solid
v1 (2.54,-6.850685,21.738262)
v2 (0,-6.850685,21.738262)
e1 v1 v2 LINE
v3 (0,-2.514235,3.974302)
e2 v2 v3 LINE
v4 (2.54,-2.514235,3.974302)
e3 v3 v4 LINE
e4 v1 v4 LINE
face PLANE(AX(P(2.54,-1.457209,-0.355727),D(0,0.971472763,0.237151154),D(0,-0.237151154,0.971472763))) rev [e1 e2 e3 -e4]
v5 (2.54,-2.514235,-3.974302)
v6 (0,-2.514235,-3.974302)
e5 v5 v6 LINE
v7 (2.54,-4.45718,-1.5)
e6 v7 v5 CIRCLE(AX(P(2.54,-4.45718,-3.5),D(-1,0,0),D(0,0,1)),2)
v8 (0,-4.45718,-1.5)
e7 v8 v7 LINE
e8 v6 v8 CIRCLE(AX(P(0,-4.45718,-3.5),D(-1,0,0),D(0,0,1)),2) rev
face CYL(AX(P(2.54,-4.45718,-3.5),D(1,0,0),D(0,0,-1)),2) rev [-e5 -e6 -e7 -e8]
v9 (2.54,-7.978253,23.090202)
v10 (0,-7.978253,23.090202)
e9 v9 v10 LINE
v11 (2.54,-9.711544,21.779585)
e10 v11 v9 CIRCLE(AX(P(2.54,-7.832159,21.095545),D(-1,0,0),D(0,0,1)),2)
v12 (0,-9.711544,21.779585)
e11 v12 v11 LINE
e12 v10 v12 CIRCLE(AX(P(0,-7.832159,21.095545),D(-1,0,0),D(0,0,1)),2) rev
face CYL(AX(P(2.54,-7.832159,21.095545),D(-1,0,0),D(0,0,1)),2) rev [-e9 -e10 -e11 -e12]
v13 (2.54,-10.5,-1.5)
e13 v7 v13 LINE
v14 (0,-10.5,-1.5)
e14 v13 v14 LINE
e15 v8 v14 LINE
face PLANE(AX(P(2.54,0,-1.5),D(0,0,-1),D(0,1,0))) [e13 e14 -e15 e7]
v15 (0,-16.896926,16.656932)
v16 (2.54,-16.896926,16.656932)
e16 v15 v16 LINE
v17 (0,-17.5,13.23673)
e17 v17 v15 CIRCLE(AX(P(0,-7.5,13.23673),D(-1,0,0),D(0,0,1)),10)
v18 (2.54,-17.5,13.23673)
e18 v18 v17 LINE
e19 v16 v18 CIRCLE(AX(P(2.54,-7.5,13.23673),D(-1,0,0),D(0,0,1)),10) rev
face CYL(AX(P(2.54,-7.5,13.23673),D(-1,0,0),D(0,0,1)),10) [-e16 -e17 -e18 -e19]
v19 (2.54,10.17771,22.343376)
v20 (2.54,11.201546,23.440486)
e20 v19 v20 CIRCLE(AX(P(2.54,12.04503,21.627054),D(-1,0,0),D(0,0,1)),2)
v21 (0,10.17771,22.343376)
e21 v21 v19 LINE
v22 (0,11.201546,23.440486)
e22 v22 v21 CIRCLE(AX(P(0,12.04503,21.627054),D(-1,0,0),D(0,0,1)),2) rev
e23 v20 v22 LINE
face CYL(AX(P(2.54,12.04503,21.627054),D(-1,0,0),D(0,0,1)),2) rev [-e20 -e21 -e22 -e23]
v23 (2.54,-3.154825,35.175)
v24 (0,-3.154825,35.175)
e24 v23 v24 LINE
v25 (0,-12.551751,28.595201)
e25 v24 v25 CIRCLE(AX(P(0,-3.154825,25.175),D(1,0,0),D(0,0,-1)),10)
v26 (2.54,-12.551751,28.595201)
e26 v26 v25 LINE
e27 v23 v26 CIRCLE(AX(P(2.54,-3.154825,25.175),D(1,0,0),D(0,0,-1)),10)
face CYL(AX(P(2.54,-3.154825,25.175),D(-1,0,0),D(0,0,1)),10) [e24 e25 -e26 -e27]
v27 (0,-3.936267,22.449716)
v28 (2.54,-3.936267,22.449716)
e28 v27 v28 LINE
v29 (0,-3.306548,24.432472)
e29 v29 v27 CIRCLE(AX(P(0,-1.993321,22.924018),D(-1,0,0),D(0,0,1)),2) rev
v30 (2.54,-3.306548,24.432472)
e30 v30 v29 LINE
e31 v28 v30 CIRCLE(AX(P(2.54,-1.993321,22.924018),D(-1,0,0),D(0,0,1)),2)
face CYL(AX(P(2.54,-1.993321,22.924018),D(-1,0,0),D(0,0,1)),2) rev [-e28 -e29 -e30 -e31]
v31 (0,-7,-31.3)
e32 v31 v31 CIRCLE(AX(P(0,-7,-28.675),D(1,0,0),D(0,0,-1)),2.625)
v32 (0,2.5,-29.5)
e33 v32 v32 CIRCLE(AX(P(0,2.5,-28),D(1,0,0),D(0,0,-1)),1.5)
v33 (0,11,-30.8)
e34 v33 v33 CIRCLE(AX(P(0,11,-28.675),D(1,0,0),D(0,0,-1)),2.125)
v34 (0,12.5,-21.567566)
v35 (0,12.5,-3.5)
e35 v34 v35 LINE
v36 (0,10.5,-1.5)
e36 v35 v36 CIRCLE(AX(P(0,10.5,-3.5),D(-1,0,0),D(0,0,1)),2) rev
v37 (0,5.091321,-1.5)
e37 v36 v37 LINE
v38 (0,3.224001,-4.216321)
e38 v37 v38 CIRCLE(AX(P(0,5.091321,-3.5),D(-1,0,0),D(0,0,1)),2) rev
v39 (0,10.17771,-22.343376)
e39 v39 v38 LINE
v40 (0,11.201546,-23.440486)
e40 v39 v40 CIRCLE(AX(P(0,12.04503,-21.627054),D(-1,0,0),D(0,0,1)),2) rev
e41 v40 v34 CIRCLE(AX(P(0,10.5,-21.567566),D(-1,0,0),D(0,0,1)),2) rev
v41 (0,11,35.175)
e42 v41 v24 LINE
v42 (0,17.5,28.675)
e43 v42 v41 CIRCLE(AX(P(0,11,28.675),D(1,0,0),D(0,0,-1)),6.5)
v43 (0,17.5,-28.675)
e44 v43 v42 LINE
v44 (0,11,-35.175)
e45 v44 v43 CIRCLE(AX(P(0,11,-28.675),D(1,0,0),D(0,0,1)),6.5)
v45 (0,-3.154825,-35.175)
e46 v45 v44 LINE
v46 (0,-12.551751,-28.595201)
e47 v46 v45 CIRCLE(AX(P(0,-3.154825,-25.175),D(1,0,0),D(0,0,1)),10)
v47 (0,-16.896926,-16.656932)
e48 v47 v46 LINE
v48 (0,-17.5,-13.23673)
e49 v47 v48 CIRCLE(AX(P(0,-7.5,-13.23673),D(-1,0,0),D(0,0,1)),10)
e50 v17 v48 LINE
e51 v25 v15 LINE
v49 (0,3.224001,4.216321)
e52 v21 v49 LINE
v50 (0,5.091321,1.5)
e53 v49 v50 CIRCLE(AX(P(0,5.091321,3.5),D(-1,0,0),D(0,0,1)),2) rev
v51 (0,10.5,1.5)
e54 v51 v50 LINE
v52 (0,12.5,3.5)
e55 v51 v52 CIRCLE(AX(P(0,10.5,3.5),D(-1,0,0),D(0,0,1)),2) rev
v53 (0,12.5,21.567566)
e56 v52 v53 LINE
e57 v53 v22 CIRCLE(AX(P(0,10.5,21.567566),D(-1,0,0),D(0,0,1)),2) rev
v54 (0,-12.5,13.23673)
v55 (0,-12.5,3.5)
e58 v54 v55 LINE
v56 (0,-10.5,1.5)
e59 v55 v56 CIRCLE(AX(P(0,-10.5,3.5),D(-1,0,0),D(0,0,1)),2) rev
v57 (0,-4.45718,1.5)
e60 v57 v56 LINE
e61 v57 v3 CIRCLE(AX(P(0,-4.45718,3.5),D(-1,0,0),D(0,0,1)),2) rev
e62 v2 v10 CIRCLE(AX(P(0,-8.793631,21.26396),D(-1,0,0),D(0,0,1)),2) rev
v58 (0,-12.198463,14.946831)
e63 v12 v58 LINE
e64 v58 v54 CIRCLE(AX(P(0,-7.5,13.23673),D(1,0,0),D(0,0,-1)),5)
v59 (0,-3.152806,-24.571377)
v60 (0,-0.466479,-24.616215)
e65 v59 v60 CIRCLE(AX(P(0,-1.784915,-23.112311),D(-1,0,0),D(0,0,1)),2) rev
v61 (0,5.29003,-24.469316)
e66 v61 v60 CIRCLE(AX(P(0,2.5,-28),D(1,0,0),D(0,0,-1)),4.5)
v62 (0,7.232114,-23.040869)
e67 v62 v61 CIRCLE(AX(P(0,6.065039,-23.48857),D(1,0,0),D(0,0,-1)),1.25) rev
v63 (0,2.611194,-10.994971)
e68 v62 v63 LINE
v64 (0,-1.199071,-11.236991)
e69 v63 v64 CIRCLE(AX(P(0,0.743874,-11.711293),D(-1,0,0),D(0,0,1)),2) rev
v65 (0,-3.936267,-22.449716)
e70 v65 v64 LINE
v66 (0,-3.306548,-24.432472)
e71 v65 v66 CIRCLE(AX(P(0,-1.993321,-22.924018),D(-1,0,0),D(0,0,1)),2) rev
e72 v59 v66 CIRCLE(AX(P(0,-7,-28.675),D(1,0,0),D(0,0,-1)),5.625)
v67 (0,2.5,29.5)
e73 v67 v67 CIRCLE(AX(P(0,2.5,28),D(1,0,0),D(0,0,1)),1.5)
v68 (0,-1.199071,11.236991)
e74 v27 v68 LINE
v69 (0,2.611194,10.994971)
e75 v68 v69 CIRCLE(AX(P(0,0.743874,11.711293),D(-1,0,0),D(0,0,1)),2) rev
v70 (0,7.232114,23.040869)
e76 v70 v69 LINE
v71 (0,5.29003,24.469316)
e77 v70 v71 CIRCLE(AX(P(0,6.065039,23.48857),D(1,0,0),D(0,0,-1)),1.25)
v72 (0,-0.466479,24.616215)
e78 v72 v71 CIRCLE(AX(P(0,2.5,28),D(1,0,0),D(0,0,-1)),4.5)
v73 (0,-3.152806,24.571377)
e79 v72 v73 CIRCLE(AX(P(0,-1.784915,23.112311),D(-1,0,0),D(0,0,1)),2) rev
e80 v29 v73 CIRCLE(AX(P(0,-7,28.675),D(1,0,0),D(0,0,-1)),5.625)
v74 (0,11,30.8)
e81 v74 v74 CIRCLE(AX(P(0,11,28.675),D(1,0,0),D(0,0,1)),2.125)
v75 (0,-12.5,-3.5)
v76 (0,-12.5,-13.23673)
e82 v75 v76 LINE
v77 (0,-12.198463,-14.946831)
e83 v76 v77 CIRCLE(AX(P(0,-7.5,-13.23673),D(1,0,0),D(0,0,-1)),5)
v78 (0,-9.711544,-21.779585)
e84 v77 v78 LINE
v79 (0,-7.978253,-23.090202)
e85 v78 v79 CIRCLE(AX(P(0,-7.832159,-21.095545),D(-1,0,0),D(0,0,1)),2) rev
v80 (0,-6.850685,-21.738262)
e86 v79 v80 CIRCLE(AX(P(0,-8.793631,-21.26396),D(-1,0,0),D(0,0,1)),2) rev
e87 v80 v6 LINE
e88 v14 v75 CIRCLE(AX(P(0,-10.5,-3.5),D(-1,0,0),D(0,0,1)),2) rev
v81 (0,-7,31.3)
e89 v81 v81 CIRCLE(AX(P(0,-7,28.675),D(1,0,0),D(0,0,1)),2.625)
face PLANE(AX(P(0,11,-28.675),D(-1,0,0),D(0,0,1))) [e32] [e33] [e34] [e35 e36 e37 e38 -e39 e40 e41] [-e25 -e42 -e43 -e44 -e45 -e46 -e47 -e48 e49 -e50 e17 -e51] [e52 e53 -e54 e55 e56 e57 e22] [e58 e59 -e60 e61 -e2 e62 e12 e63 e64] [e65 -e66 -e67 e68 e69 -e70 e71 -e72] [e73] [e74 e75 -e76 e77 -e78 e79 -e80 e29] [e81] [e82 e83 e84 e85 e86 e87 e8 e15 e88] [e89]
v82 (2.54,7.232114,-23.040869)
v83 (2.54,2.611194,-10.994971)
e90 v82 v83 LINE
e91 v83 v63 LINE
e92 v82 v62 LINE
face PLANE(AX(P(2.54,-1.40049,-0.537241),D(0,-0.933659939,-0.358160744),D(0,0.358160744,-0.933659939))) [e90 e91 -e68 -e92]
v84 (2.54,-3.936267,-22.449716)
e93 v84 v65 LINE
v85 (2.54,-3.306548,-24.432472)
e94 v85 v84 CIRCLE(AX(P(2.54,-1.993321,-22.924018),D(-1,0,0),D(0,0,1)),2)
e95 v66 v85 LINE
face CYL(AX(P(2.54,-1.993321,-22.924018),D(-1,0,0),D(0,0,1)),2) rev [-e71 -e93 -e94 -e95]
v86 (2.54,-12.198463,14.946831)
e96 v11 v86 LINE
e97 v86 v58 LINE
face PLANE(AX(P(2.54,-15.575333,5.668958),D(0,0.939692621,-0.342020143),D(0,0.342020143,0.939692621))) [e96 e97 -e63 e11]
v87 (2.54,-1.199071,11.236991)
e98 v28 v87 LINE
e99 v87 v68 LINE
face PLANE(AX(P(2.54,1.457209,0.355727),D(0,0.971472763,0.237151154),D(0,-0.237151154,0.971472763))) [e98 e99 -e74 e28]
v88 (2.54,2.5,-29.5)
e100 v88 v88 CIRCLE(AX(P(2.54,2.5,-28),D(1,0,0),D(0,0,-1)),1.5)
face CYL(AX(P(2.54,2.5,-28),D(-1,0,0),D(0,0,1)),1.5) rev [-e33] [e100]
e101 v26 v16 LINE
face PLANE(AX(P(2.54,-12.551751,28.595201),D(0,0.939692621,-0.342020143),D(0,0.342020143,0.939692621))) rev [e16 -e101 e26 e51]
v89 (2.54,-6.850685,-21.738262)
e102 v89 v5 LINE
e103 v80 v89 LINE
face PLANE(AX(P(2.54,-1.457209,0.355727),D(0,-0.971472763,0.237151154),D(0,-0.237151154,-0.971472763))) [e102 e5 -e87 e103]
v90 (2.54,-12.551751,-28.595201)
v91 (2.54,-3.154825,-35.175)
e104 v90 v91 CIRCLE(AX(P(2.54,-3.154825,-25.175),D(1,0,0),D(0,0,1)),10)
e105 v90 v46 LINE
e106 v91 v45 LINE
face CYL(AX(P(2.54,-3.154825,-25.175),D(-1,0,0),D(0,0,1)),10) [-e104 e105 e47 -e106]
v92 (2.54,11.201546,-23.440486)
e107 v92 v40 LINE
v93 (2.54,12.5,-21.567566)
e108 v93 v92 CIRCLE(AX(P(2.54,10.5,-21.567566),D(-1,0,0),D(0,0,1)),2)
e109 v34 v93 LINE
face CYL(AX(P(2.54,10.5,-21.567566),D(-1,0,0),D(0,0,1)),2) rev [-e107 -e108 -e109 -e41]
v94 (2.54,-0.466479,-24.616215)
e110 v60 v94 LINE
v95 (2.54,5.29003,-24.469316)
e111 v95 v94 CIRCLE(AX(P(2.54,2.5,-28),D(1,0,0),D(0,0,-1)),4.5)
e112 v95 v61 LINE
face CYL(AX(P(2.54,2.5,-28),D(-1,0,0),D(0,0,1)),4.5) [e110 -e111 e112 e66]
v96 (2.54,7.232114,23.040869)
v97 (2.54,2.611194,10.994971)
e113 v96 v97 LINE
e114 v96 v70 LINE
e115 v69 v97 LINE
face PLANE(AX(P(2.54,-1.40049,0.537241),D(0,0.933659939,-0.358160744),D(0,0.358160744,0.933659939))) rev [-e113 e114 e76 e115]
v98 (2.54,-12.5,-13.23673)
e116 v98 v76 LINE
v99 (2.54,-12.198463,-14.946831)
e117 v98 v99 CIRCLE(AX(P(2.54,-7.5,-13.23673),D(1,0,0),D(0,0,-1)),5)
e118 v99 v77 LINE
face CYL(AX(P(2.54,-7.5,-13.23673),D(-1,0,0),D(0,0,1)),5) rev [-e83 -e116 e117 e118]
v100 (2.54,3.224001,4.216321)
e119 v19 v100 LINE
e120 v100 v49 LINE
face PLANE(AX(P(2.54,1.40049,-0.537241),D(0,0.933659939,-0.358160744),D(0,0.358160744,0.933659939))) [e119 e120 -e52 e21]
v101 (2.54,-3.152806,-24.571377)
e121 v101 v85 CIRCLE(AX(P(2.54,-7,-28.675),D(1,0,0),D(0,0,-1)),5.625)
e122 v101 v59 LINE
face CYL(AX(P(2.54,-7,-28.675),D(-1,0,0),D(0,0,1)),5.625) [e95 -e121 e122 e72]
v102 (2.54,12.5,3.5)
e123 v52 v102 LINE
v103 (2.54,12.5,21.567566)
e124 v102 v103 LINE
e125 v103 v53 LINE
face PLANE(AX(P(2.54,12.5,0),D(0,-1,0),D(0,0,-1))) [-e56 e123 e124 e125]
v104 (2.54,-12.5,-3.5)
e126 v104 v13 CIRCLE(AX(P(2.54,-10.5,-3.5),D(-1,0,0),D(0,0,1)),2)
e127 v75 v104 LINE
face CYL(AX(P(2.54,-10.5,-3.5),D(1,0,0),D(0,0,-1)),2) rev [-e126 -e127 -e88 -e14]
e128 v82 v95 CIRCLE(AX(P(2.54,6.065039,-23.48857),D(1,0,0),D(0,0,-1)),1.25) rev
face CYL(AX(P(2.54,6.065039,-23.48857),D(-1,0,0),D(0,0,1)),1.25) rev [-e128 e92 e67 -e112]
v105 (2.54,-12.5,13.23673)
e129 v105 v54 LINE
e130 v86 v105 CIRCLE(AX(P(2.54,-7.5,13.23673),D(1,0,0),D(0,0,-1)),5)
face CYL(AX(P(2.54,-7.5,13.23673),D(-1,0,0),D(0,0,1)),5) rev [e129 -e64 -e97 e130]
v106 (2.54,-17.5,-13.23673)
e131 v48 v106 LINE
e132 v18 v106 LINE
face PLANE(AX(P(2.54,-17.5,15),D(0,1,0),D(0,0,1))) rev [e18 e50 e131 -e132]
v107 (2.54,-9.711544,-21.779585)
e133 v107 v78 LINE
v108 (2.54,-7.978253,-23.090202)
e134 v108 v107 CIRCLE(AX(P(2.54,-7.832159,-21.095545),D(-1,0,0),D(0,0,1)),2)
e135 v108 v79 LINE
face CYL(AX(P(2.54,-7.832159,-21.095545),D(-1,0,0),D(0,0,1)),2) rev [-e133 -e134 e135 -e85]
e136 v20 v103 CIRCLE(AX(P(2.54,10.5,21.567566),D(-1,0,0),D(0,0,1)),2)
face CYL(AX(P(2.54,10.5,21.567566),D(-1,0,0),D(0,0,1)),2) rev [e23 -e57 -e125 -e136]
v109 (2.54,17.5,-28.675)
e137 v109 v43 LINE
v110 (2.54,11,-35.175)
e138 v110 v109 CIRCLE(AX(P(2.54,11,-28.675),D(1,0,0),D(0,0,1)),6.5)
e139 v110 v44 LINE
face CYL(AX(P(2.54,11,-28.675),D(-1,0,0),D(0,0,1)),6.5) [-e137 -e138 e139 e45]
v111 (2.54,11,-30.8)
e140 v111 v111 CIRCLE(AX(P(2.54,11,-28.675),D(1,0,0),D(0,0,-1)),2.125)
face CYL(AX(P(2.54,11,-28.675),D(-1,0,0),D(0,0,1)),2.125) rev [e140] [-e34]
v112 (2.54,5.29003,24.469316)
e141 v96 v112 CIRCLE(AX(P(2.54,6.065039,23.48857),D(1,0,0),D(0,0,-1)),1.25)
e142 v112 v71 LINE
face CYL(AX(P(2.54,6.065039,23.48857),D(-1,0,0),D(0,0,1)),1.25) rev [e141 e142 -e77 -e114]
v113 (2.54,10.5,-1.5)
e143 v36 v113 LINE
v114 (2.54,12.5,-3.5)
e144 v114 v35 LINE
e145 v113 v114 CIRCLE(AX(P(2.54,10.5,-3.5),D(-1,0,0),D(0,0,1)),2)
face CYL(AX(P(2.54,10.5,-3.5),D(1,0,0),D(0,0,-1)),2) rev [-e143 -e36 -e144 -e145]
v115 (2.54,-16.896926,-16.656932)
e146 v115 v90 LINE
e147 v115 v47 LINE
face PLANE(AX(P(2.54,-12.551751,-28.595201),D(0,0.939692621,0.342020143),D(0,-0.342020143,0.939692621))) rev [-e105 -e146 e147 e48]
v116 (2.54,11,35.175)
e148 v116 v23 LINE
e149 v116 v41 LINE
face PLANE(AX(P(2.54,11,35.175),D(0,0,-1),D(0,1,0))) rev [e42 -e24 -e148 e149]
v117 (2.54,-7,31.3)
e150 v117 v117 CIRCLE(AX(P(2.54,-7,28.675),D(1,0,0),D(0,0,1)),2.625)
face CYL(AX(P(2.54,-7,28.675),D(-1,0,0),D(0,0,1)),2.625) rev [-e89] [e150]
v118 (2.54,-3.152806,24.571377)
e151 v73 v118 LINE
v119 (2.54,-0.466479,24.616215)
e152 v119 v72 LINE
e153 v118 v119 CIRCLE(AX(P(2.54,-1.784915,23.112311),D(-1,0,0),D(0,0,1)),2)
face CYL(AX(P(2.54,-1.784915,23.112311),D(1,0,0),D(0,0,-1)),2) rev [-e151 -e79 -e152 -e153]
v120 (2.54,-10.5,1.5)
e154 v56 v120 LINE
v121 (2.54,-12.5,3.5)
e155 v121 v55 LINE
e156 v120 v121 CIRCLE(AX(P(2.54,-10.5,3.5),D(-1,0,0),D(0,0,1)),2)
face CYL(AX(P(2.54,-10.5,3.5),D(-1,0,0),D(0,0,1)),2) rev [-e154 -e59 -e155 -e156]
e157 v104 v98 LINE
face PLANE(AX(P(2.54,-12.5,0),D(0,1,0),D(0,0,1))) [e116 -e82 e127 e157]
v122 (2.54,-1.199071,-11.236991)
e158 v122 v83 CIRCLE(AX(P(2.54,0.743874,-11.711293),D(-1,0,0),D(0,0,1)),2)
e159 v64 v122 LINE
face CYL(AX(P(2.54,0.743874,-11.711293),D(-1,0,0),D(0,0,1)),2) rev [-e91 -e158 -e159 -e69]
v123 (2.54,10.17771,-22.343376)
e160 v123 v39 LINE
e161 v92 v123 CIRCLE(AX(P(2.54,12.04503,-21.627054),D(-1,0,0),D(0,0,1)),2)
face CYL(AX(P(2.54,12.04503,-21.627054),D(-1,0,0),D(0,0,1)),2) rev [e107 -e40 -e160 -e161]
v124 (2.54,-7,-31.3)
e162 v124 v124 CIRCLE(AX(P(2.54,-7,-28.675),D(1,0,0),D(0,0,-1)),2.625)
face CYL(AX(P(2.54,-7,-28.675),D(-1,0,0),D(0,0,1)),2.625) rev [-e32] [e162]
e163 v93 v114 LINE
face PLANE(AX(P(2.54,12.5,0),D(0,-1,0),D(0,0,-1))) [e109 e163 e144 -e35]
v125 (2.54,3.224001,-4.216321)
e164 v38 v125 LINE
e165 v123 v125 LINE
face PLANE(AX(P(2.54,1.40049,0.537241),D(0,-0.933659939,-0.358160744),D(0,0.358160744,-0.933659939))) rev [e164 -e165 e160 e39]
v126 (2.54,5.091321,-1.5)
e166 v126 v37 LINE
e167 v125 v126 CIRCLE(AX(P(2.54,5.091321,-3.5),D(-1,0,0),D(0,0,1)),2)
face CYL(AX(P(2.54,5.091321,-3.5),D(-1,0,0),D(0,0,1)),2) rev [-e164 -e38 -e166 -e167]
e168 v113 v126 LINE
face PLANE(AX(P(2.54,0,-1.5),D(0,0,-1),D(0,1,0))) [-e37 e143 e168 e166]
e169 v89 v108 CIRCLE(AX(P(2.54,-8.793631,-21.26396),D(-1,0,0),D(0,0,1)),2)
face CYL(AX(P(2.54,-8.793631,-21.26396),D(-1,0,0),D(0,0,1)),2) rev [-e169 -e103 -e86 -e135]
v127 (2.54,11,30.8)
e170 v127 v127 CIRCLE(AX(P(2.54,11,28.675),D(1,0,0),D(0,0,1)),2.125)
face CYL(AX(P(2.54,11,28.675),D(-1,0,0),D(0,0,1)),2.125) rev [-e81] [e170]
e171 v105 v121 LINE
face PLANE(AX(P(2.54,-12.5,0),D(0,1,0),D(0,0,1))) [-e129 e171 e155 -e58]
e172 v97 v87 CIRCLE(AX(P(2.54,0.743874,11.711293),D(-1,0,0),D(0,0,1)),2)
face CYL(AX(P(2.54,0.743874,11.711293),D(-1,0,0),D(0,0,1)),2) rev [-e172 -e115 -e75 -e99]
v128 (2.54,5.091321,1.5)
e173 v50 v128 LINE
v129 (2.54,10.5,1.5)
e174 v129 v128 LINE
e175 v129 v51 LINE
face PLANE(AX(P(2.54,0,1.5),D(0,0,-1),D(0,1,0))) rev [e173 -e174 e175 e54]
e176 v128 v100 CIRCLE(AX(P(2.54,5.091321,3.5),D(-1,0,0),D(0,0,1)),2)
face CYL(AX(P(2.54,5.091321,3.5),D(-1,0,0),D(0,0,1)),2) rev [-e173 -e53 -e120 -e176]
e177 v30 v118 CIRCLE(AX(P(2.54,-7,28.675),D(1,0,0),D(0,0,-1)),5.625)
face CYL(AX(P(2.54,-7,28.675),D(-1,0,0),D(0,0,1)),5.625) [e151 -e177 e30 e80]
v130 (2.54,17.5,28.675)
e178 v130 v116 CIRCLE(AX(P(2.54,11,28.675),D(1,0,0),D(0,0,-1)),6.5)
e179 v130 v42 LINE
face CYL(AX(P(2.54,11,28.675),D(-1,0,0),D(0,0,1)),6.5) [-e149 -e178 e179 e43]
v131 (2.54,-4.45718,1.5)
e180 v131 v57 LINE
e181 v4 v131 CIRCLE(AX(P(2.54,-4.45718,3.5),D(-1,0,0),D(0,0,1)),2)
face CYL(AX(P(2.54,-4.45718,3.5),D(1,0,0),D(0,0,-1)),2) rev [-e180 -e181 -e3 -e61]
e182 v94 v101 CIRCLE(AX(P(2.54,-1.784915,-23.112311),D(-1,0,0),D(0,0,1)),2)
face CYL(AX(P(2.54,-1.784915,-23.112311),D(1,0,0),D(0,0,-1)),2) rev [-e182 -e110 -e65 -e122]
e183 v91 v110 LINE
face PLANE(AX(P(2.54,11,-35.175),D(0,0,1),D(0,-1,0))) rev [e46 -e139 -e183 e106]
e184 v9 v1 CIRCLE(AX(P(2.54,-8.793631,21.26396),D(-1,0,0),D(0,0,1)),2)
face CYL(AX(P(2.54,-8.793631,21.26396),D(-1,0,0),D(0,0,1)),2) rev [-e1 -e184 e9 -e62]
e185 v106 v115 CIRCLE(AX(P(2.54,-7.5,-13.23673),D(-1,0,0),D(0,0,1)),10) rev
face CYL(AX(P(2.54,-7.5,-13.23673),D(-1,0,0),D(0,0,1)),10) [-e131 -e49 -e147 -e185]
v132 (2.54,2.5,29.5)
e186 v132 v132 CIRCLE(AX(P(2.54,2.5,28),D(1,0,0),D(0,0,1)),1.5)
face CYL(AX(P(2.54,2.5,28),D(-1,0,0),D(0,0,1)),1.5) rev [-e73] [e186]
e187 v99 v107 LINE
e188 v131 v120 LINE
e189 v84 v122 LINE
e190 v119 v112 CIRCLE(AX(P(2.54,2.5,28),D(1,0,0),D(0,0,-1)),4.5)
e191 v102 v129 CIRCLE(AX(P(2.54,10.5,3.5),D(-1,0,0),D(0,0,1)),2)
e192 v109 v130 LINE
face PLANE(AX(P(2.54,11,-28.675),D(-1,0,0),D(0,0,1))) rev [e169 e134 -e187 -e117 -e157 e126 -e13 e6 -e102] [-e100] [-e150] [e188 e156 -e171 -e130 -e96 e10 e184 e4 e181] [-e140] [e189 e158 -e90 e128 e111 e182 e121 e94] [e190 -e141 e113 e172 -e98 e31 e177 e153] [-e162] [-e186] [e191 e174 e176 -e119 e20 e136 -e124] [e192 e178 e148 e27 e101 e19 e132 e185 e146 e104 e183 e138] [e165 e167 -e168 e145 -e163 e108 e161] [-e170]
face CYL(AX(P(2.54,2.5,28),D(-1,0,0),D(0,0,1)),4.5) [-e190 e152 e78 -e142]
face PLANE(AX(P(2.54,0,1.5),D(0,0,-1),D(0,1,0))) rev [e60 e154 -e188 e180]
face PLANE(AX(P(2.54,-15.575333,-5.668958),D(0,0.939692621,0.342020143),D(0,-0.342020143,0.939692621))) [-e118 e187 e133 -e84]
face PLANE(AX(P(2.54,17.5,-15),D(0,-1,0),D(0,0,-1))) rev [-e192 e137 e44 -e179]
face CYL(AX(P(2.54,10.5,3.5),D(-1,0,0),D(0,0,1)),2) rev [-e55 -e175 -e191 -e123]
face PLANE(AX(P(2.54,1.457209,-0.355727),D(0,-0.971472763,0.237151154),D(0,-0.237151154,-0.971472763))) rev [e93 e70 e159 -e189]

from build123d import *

# Parameters (mm, degrees)
SKETCH1_R           = 2.125
SKETCH1_R_2         = 1.5
SKETCH1_R_3         = 2.625
BOSS_EXTRUDE1_DEPTH = 2.54
FILLET1_R           = 10
CUT_EXTRUDE2_DEPTH  = 40.369813627
FILLET2_R           = 2


with BuildPart() as part:
    # Sketch1 → Boss-Extrude1 (new body)
    with BuildSketch(Plane(origin=(0, 0, 0), x_dir=(0, 0, -1), z_dir=(1, 0, 0))):
        with BuildLine():
            Line((15, 17.5), (28.675, 17.5))
            ThreePointArc((28.675, 17.5), (33.271194078, 15.596194078), (35.175, 11))
            Line((35.175, 11), (35.175, -3.154825142))
            ThreePointArc((35.175, -3.154825142), (33.366520443, -8.890589505), (28.595201433, -12.551751349))
            Line((28.595201433, -12.551751349), (15, -17.5))
            Line((15, -17.5), (-15, -17.5))
            Line((-15, -17.5), (-28.595201433, -12.551751349))
            ThreePointArc((-28.595201433, -12.551751349), (-33.366520443, -8.890589505), (-35.175, -3.154825142))
            Line((-35.175, -3.154825142), (-35.175, 11))
            ThreePointArc((-35.175, 11), (-33.271194078, 15.596194078), (-28.675, 17.5))
            Line((-28.675, 17.5), (-15, 17.5))
            Line((-15, 17.5), (15, 17.5))
        make_face()
        with Locations((28.675, 11)):
            Circle(SKETCH1_R, mode=Mode.SUBTRACT)
        with Locations(Location((-28.675, 11, 0), (0, 0, 180))):
            Circle(SKETCH1_R, mode=Mode.SUBTRACT)
        with Locations((28, 2.5)):
            Circle(SKETCH1_R_2, mode=Mode.SUBTRACT)
        with Locations(Location((-28, 2.5, 0), (0, 0, 180))):
            Circle(SKETCH1_R_2, mode=Mode.SUBTRACT)
        with Locations((28.675, -7)):
            Circle(SKETCH1_R_3, mode=Mode.SUBTRACT)
        with Locations(Location((-28.675, -7, 0), (0, 0, 180))):
            Circle(SKETCH1_R_3, mode=Mode.SUBTRACT)
    extrude(amount=BOSS_EXTRUDE1_DEPTH)

    # Fillet1
    fillet1_edges = [part.edges().sort_by_distance(p)[0] for p in [
        (1.27, -17.5, -15),
        (1.27, -17.5, 15),
    ]]
    fillet(fillet1_edges, radius=FILLET1_R)

    # Sketch2 → Cut-Extrude2 (cut, through all)
    with BuildSketch(Plane(origin=(0, 0, 0), x_dir=(0, 0, -1), z_dir=(1, 0, 0))):
        with BuildLine():
            ThreePointArc((-23.774426054, 12.5), (-23.583197925, 11.582388729), (-23.562289313, 10.645296699))
            Line((-23.562289313, 10.645296699), (-1.5, 2.181994783))
            Line((-1.5, 2.181994783), (-1.5, 12.5))
            Line((-1.5, 12.5), (-23.774426054, 12.5))
        make_face()
        with BuildLine():
            ThreePointArc((-23.040869369, 7.232113781), (-24.495524174, 6.805676348), (-24.469315886, 5.29003041))
            ThreePointArc((-24.469315886, 5.29003041), (-23.690537785, 1.204416959), (-26.593153981, -1.774433796))
            ThreePointArc((-26.593153981, -1.774433796), (-24.964789293, -2.77212092), (-23.764069674, -4.257120431))
            Line((-23.764069674, -4.257120431), (-5.019125542, 0.318803158))
            Line((-5.019125542, 0.318803158), (-23.040869369, 7.232113781))
        make_face()
        with BuildLine():
            Line((23.774426054, 12.5), (1.5, 12.5))
            Line((1.5, 12.5), (1.5, 2.181994783))
            Line((1.5, 2.181994783), (23.562289313, 10.645296699))
            ThreePointArc((23.562289313, 10.645296699), (23.583197925, 11.582388729), (23.774426054, 12.5))
        make_face()
        with BuildLine():
            Line((-1.5, -12.5), (-1.5, -1.91022003))
            Line((-1.5, -1.91022003), (-23.052616211, -7.171538721))
            ThreePointArc((-23.052616211, -7.171538721), (-23.169671761, -8.15411697), (-23.457097153, -9.100979506))
            Line((-23.457097153, -9.100979506), (-14.94683091, -12.198463104))
            ThreePointArc((-14.94683091, -12.198463104), (-14.104971081, -12.424038765), (-13.236730193, -12.5))
            Line((-13.236730193, -12.5), (-1.5, -12.5))
        make_face()
        with BuildLine():
            Line((23.052616211, -7.171538721), (1.5, -1.91022003))
            Line((1.5, -1.91022003), (1.5, -12.5))
            Line((1.5, -12.5), (13.236730193, -12.5))
            ThreePointArc((13.236730193, -12.5), (14.104971081, -12.424038765), (14.94683091, -12.198463104))
            Line((14.94683091, -12.198463104), (23.457097153, -9.100979506))
            ThreePointArc((23.457097153, -9.100979506), (23.169671761, -8.15411697), (23.052616211, -7.171538721))
        make_face()
        with BuildLine():
            Line((23.040869369, 7.232113781), (5.019125542, 0.318803158))
            Line((5.019125542, 0.318803158), (23.764069674, -4.257120431))
            ThreePointArc((23.764069674, -4.257120431), (24.964789293, -2.77212092), (26.593153981, -1.774433796))
            ThreePointArc((26.593153981, -1.774433796), (23.690537785, 1.204416959), (24.469315886, 5.29003041))
            ThreePointArc((24.469315886, 5.29003041), (24.495524174, 6.805676348), (23.040869369, 7.232113781))
        make_face()
    extrude(amount=CUT_EXTRUDE2_DEPTH, mode=Mode.SUBTRACT)

    # Fillet2
    # the kernel refuses this fillet: 2 mm, written as the material it adds along each edge
    with BuildSketch(Plane(origin=(0, -12.5, -1.5), x_dir=(0, 0, -1), z_dir=(1, 0, 0)), Plane(origin=(0, 12.5, -1.5), x_dir=(0, -1, 0), z_dir=(1, 0, 0))) as fillet2_piece_1:
        with BuildLine():
            CenterArc((FILLET2_R, FILLET2_R), FILLET2_R, 180, 90)
            Line((0, FILLET2_R), (0, 0))
            Line((0, 0), (FILLET2_R, 0))
        make_face()
    extrude(amount=2.54)
    with BuildSketch(Plane(origin=(0, -12.5, 1.5), x_dir=(0, 0, 1), z_dir=(1, 0, 0)), Plane(origin=(0, 12.5, 1.5), x_dir=(0, -1, 0), z_dir=(1, 0, 0))) as fillet2_piece_2:
        with BuildLine():
            CenterArc((FILLET2_R, -FILLET2_R), FILLET2_R, 90, 90)
            Line((0, -FILLET2_R), (0, 0))
            Line((0, 0), (FILLET2_R, 0))
        make_face()
    extrude(amount=2.54)
    with BuildSketch(Plane(origin=(0, -1.91022003, -1.5), x_dir=(0, -1, 0), z_dir=(1, 0, 0)), Plane(origin=(0, -1.91022003, 1.5), x_dir=(0, -0.23715115410902912, 0.9714727634394881), z_dir=(1, 0, 0))) as fillet2_piece_3:
        with BuildLine():
            CenterArc((FILLET2_R * 1.27348001989, FILLET2_R), FILLET2_R, 166.281540054, 103.718459946)
            Line((FILLET2_R * 0.302007256452, FILLET2_R * 1.23715115411), (0, 0))
            Line((0, 0), (FILLET2_R * 1.27348001989, 0))
        make_face()
    extrude(amount=2.54)
    with BuildSketch(Plane(origin=(0, -9.100979506, -23.457097153), x_dir=(0, 0.9698771558526914, 0.24359454541326273), z_dir=(1, 0, 0))) as fillet2_piece_4:
        with BuildLine():
            CenterArc((1.805861593, 1.981337572), FILLET2_R, 185.90120906, 76.265486652)
            Line((-0.183539703, 1.775710517), (0, 0))
            ThreePointArc((0, 0), (0.766639355, 0.05248808), (1.533278711, 0))
        make_face()
    extrude(amount=2.54)
    with BuildSketch(Plane(origin=(0, -7.171538721, -23.052616211), x_dir=(0, -0.991038367867246, -0.13357751837425885), z_dir=(1, 0, 0)), Plane(origin=(0, -4.257120431, 23.764069674), x_dir=(0, 0.8180162943485203, 0.5751950470756115), z_dir=(1, 0, 0))) as fillet2_piece_5:
        with BuildLine():
            CenterArc((1.368631059, -1.989301963), FILLET2_R, 95.928822705, 62.676344636)
            Line((-0.493546379, -1.259716335), (0, 0))
            ThreePointArc((0, 0), (0.581022619, -0.03008823), (1.162045239, 0))
        make_face()
    extrude(amount=2.54)
    with BuildSketch(Plane(origin=(0, 2.181994783, -1.5), x_dir=(0, 0.3581607437996355, -0.9336599389504147), z_dir=(1, 0, 0)), Plane(origin=(0, 2.181994783, 1.5), x_dir=(0, 1, 0), z_dir=(1, 0, 0))) as fillet2_piece_6:
        with BuildLine():
            CenterArc((FILLET2_R * 1.45466318853, FILLET2_R), FILLET2_R, 159.012716108, 110.987283892)
            Line((FILLET2_R * 0.521003249583, FILLET2_R * 1.3581607438), (0, 0))
            Line((0, 0), (FILLET2_R * 1.45466318853, 0))
        make_face()
    extrude(amount=2.54)
    with BuildSketch(Plane(origin=(0, 10.645296699, -23.562289313), x_dir=(0, -0.3581607437996529, 0.9336599389504079), z_dir=(1, 0, 0))) as fillet2_piece_7:
        with BuildLine():
            CenterArc((1.305521848, -2), FILLET2_R, 90, 60.578668933)
            ThreePointArc((-0.436540129, -1.01754386), (-0.190709987, -0.520595577), (0, 0))
            Line((0, 0), (1.305521848, 0))
        make_face()
    extrude(amount=2.54)
    with BuildSketch(Plane(origin=(0, 12.5, -23.774426054), x_dir=(0, 0, 1), z_dir=(1, 0, 0))) as fillet2_piece_8:
        with BuildLine():
            CenterArc((2.206860542, 2), FILLET2_R, 184.024063889, 85.975936111)
            ThreePointArc((0.211791212, 1.859649123), (0.191509232, 0.92007422), (0, 0))
            Line((0, 0), (2.206860542, 0))
        make_face()
    extrude(amount=2.54)
    with BuildSketch(Plane(origin=(0, -7.171538721, 23.052616211), x_dir=(0, -0.9910383678672416, 0.13357751837428994), z_dir=(1, 0, 0))) as fillet2_piece_9:
        with BuildLine():
            CenterArc((1.368631059, 1.989301963), FILLET2_R, 201.394832659, 62.676344636)
            Line((-0.493546379, 1.259716335), (0, 0))
            ThreePointArc((0, 0), (0.581022619, 0.03008823), (1.162045239, 0))
        make_face()
    extrude(amount=2.54)
    with BuildSketch(Plane(origin=(0, -9.100979506, 23.457097153), x_dir=(0, -0.342020143325639, -0.9396926207859192), z_dir=(1, 0, 0))) as fillet2_piece_10:
        with BuildLine():
            CenterArc((1.785170766, 2), FILLET2_R, 193.734513348, 76.265486652)
            ThreePointArc((-0.157641792, 1.525153327), (-0.026610969, 0.767973148), (0, 0))
            Line((0, 0), (1.785170766, 0))
        make_face()
    extrude(amount=2.54)
    with BuildSketch(Plane(origin=(0, 0.318803158, -5.019125542), x_dir=(0, -0.23715115410902946, -0.971472763439488), z_dir=(1, 0, 0)), Plane(origin=(0, 0.318803158, 5.019125542), x_dir=(0, 0.3581607437996354, 0.9336599389504147), z_dir=(1, 0, 0))) as fillet2_piece_11:
        with BuildLine():
            CenterArc((FILLET2_R * 3.20022614882, FILLET2_R), FILLET2_R, 124.705743839, 145.294256161)
            Line((FILLET2_R * 2.63086420922, FILLET2_R * 1.82208696726), (0, 0))
            Line((0, 0), (FILLET2_R * 3.20022614882, 0))
        make_face()
    extrude(amount=2.54)
    with BuildSketch(Plane(origin=(0, -4.257120431, -23.764069674), x_dir=(0, 0.23715115410907214, 0.9714727634394775), z_dir=(1, 0, 0))) as fillet2_piece_12:
        with BuildLine():
            CenterArc((1.352949842, -2), FILLET2_R, 90, 62.676344636)
            ThreePointArc((-0.423905752, -1.081967213), (-0.183938065, -0.551959577), (0, 0))
            Line((0, 0), (1.352949842, 0))
        make_face()
    extrude(amount=2.54)
    with BuildSketch(Plane(origin=(0, -1.774433796, -26.593153981), x_dir=(0, 0.5517747839578403, 0.8339931581183857), z_dir=(1, 0, 0))) as fillet2_piece_13:
        with BuildLine():
            CenterArc((2.89721625, 1.929382533), FILLET2_R, 170.336114641, 84.3929753)
            ThreePointArc((0.925597299, 2.265118609), (0.587459761, 1.081618931), (0, 0))
            ThreePointArc((0, 0), (1.18522483, 0.158889301), (2.370449659, 0))
        make_face()
    extrude(amount=2.54)
    with BuildSketch(Plane(origin=(0, -1.774433796, 26.593153981), x_dir=(0, -0.5633055097989954, -0.826248692967253), z_dir=(1, 0, 0))) as fillet2_piece_14:
        with BuildLine():
            CenterArc((2.881946095, 1.95211825), FILLET2_R, 173.04447146, 84.3929753)
            ThreePointArc((0.896665206, 2.194316088), (0.595415815, 1.037055309), (0, 0))
            ThreePointArc((0, 0), (1.223467682, 0.134667421), (2.446935364, 0))
        make_face()
    extrude(amount=2.54)
    with BuildSketch(Plane(origin=(0, 12.5, 23.774426054), x_dir=(0, -0.9935772054285649, -0.11315624972913957), z_dir=(1, 0, 0))) as fillet2_piece_15:
        with BuildLine():
            CenterArc((2.236874473, 1.966373831), FILLET2_R, 173.502708243, 85.975936111)
            Line((0.249720063, 2.19268633), (0, 0))
            ThreePointArc((0, 0), (0.935835239, 0.086167059), (1.871670478, 0))
        make_face()
    extrude(amount=2.54)
    with BuildSketch(Plane(origin=(0, 10.645296699, 23.562289313), x_dir=(0, -0.35816074379962426, -0.9336599389504189), z_dir=(1, 0, 0))) as fillet2_piece_16:
        with BuildLine():
            CenterArc((1.305521848, 2), FILLET2_R, 209.421331067, 60.578668933)
            ThreePointArc((-0.436540129, 1.01754386), (-0.190709987, 0.520595577), (0, 0))
            Line((0, 0), (1.305521848, 0))
        make_face()
    extrude(amount=2.54)


solid = part.part
